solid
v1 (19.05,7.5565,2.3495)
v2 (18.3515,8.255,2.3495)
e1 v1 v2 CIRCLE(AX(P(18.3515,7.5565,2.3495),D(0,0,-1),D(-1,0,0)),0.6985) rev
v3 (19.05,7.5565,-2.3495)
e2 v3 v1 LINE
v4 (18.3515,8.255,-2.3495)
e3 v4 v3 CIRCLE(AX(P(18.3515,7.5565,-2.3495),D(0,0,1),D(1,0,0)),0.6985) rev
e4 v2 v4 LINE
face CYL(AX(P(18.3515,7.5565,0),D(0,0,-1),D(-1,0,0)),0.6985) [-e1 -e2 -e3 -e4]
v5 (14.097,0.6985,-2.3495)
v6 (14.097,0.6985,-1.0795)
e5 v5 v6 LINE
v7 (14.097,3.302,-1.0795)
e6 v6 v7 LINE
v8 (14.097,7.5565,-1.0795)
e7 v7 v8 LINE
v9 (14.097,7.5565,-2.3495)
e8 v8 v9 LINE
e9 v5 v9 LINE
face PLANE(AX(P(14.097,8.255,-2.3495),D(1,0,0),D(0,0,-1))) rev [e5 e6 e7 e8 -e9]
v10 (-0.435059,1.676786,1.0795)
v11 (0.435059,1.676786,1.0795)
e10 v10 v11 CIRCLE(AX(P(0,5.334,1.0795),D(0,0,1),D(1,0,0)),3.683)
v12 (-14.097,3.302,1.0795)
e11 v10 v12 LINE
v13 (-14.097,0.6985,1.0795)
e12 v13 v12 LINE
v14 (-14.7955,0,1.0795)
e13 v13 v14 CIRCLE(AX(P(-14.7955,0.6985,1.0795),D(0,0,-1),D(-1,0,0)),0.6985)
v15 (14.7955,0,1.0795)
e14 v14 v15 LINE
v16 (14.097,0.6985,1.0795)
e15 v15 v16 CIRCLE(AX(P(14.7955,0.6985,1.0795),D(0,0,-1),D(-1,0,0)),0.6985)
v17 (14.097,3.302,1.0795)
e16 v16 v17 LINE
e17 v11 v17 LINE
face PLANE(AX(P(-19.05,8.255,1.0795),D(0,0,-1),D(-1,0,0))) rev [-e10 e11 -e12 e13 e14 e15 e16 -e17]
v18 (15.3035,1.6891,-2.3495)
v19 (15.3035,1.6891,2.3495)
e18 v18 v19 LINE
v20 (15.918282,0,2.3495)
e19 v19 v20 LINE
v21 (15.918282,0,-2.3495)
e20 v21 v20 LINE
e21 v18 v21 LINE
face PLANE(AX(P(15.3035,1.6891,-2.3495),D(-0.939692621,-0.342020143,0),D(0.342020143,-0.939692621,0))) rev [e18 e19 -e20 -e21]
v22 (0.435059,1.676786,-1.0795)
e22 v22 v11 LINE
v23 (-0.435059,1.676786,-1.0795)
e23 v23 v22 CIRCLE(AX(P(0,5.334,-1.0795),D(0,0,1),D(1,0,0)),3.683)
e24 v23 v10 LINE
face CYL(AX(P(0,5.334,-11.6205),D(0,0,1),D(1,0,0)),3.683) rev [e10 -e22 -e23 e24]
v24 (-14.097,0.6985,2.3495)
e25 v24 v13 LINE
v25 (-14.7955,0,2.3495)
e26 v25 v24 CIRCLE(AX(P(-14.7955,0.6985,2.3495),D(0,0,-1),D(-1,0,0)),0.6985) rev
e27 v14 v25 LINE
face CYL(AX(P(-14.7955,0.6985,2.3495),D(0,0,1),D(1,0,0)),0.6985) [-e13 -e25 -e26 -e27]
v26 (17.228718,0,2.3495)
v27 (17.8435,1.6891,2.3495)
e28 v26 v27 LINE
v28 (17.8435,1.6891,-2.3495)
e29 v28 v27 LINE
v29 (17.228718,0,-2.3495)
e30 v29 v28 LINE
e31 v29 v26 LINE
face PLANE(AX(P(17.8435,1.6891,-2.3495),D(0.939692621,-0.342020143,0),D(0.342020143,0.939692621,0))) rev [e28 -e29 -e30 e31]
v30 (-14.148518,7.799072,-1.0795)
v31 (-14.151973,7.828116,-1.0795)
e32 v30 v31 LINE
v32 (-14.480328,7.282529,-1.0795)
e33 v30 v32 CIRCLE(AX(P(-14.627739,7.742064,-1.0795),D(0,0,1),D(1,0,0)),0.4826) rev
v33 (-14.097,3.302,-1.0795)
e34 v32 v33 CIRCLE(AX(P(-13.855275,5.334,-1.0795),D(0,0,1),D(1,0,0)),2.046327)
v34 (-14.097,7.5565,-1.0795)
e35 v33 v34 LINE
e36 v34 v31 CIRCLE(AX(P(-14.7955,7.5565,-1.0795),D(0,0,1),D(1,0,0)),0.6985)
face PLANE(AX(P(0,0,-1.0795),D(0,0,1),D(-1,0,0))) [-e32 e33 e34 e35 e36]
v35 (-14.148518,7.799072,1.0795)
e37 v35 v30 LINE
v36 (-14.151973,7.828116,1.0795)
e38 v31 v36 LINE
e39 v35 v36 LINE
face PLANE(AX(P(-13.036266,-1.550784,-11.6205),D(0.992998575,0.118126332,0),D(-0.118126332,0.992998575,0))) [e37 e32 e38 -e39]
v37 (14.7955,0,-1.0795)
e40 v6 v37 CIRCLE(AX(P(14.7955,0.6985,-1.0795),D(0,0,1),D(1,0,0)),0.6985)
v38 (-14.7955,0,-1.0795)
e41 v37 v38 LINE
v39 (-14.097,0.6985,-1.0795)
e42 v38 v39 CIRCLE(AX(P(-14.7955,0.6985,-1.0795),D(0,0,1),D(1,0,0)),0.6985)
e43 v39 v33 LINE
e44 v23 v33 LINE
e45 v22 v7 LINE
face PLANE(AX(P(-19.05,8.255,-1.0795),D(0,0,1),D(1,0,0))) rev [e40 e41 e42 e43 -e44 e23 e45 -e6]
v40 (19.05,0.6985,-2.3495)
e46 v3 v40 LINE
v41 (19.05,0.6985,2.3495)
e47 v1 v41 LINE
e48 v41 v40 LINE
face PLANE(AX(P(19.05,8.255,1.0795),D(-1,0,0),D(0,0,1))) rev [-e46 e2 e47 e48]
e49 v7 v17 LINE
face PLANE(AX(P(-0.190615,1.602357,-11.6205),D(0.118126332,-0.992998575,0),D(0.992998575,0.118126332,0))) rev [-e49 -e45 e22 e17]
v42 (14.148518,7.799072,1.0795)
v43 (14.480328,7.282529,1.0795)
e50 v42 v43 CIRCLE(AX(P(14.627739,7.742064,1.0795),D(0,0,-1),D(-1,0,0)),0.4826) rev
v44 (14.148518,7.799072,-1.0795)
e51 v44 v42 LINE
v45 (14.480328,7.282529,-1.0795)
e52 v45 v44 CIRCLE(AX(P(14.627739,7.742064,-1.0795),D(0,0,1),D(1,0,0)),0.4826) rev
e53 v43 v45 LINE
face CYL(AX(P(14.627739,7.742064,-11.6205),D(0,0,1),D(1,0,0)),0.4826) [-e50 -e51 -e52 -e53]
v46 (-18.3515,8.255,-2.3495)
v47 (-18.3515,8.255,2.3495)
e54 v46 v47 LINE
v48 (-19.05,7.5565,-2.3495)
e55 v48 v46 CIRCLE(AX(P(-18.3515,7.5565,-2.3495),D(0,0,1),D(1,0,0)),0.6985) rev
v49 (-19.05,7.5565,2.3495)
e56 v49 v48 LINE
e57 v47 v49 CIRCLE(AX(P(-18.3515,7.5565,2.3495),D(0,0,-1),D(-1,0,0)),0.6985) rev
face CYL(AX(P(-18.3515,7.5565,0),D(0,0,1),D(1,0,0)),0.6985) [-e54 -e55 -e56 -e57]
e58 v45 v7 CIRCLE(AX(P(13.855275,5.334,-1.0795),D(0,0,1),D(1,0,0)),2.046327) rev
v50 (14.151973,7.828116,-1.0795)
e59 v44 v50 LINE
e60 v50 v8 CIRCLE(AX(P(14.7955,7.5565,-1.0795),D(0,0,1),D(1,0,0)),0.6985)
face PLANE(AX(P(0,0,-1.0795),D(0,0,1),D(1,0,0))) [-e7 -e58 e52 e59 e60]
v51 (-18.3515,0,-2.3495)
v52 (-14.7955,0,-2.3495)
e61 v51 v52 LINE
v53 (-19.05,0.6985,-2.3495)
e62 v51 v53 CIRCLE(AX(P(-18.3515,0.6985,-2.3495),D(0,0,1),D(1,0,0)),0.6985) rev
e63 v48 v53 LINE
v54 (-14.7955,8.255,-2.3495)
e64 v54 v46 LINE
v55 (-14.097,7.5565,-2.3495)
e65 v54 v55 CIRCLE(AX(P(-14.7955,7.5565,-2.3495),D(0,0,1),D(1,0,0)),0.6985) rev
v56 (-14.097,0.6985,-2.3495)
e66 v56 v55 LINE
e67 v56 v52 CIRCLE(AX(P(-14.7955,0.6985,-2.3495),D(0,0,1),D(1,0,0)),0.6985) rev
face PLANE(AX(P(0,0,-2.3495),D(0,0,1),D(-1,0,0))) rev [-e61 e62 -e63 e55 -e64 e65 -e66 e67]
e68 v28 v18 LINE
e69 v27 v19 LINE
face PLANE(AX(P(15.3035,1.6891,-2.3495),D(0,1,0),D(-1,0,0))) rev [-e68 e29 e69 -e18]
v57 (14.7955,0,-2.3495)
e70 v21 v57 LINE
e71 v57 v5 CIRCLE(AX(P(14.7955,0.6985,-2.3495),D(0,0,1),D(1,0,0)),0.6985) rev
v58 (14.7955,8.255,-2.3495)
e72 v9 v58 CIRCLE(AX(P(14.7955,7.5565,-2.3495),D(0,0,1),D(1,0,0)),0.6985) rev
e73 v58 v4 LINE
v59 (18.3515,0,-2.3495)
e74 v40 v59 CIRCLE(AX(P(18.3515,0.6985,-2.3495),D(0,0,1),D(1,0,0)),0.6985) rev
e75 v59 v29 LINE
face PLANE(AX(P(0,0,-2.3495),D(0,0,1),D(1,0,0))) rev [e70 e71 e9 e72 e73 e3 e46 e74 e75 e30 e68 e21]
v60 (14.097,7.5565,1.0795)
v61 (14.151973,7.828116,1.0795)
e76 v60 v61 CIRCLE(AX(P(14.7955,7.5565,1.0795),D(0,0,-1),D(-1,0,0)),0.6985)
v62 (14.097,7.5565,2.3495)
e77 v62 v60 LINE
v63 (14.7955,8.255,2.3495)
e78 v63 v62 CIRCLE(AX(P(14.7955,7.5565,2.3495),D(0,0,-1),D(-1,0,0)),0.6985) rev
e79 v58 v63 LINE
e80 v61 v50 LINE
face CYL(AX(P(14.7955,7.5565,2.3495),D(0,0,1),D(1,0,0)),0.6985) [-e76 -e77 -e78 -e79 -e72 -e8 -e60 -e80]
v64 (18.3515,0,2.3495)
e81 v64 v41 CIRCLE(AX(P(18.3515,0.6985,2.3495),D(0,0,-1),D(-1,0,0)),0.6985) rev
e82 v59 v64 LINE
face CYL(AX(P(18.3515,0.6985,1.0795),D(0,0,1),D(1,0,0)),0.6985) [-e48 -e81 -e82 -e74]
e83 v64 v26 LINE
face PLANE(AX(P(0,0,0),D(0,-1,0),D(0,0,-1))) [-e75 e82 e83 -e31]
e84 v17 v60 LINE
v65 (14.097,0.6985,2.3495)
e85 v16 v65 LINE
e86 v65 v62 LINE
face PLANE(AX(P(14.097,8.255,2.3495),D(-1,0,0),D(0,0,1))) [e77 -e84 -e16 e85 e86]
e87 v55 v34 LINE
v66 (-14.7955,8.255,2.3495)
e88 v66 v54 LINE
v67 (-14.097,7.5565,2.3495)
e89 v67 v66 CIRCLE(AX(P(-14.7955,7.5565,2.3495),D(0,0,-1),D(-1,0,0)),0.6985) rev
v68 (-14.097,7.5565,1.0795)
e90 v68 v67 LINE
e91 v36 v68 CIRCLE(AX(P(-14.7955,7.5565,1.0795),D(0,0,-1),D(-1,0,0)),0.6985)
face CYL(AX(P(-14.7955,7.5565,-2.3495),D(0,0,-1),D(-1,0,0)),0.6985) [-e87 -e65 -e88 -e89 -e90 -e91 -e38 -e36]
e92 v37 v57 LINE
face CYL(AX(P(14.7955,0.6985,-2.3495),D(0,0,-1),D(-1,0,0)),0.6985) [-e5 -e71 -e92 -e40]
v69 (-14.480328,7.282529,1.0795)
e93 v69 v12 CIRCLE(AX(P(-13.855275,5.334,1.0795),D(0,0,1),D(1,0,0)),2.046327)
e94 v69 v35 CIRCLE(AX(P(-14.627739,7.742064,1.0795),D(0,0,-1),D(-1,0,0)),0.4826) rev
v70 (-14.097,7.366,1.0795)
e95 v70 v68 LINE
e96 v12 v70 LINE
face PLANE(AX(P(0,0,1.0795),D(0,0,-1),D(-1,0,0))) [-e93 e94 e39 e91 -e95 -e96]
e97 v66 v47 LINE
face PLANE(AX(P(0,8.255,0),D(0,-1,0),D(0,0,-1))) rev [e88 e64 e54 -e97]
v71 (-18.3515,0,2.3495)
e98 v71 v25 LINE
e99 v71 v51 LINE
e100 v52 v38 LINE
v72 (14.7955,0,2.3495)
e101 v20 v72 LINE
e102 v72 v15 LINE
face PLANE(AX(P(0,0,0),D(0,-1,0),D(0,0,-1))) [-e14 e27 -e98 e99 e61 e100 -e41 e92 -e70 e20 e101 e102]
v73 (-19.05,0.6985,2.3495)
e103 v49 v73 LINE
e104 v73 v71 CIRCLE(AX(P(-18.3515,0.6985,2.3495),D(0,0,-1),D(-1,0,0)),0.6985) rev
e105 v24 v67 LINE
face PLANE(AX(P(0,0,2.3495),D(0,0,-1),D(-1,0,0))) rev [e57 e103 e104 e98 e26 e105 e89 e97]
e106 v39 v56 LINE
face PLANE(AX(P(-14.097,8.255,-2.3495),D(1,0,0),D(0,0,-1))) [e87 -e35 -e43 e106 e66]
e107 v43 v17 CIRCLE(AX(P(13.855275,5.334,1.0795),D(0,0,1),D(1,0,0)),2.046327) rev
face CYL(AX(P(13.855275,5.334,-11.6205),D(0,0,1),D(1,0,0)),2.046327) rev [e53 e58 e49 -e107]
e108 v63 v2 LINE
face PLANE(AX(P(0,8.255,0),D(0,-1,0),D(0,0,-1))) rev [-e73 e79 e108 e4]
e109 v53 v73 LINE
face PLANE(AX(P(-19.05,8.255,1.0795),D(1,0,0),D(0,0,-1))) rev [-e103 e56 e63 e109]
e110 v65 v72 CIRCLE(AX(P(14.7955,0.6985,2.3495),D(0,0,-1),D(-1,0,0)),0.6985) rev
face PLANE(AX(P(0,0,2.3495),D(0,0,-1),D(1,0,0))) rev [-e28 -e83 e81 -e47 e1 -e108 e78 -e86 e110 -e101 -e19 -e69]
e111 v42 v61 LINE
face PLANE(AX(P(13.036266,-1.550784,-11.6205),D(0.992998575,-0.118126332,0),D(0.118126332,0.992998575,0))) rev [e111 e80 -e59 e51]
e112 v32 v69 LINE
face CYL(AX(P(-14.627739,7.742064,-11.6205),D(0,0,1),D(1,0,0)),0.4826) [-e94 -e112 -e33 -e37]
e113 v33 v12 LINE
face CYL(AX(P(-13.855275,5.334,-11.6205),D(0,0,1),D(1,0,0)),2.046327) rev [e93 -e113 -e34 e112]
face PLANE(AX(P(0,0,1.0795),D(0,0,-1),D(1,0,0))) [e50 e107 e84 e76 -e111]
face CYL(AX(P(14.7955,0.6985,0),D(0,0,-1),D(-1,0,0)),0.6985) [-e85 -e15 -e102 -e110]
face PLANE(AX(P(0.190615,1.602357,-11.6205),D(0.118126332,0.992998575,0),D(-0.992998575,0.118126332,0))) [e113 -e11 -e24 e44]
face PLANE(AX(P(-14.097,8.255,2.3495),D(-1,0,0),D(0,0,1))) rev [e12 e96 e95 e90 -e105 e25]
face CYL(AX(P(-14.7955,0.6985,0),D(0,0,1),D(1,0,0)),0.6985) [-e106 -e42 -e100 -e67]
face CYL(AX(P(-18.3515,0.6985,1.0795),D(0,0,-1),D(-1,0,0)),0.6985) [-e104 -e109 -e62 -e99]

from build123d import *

# Parameters (mm, degrees)
SKETCH1_W               = 38.1
SKETCH1_H               = 2.159
BOSS_EXTRUDE1_DEPTH     = 8.255
CUT_EXTRUDE1_DEPTH      = 12.7
SKETCH3_W               = 4.953
SKETCH3_H               = 8.255
BOSS_EXTRUDE2_DEPTH     = 1.27
FILLET5_R               = 0.4826
MIRROR2_COPY_1_SKETCH_W = 4.953
MIRROR2_COPY_1_SKETCH_H = 8.255
MIRROR2_COPY_1_DEPTH    = 1.27
CUT_EXTRUDE2_DEPTH      = 22.286806422
FILLET6_R               = 0.6985


with BuildPart() as part:
    # Sketch1 → Boss-Extrude1 (new body)
    with BuildSketch(Plane(origin=(0, 0, 0), x_dir=(1, 0, 0), z_dir=(0, 1, 0))):
        Rectangle(SKETCH1_W, SKETCH1_H)
    extrude(amount=BOSS_EXTRUDE1_DEPTH)

    # Sketch2 → Cut-Extrude1 (cut)
    with BuildSketch(Plane.XY.offset(1.0795)):
        with BuildLine():
            ThreePointArc((-0.435059279, 1.676786249), (0, 1.651), (0.435059279, 1.676786249))
            Line((0.435059279, 1.676786249), (14.097, 3.302))
            ThreePointArc((14.097, 3.302), (15.901602081, 5.334), (14.097, 7.366))
            Line((14.097, 7.366), (14.202754743, 8.255))
            Line((14.202754743, 8.255), (-14.202754743, 8.255))
            Line((-14.202754743, 8.255), (-14.097, 7.366))
            ThreePointArc((-14.097, 7.366), (-15.901602081, 5.334), (-14.097, 3.302))
            Line((-14.097, 3.302), (-0.435059279, 1.676786249))
        make_face()
    extrude(amount=-CUT_EXTRUDE1_DEPTH, mode=Mode.SUBTRACT)

    # Sketch3 → Boss-Extrude2 (add)
    with BuildSketch(Plane.XY.offset(1.0795)):
        with Locations((-16.5735, 4.1275)):
            Rectangle(SKETCH3_W, SKETCH3_H)
    boss_extrude2 = extrude(amount=BOSS_EXTRUDE2_DEPTH)

    # Fillet5
    fillet5_edges = [part.edges().sort_by_distance(p)[0] for p in [
        (14.202754743, 8.255, 0),
        (-14.202754743, 8.255, 0),
        (14.097, 7.366, 0),
        (-14.097, 7.366, 0),
    ]]
    fillet(fillet5_edges, radius=FILLET5_R)

    # Mirror1: Boss-Extrude2 across plane
    add(boss_extrude2.mirror(Plane(origin=(0, 0, 0), x_dir=(0, 0, 1), z_dir=(1, 0, 0))))

    # Mirror2: Boss-Extrude2 across plane
    add(boss_extrude2.mirror(Plane.XY))

    # Mirror2 copy 1 sketch → Mirror2 copy 1 (add)
    with BuildSketch(Plane(origin=(0, 0, -1.0795), x_dir=(-1, 0, 0), z_dir=(0, 0, -1))):
        with Locations((-16.5735, 4.1275)):
            Rectangle(MIRROR2_COPY_1_SKETCH_W, MIRROR2_COPY_1_SKETCH_H)
    extrude(amount=MIRROR2_COPY_1_DEPTH)

    # Sketch4 → Cut-Extrude2 (cut, through all)
    with BuildSketch(Plane.XY.offset(2.3495)):
        Polygon((15.3035, 1.6891), (17.8435, 1.6891), (17.228717877, 0), (15.918282123, 0), align=None)
    extrude(amount=-CUT_EXTRUDE2_DEPTH, mode=Mode.SUBTRACT)

    # Fillet6
    # the kernel refuses this fillet: 0.6985 mm, written as the material it takes off along each edge
    with BuildSketch(Plane(origin=(-19.05, 8.255, -4.09575), x_dir=(1, 0, 0), z_dir=(0, 0, 1)), Plane(origin=(19.05, 8.255, 4.09575), x_dir=(-1, 0, 0), z_dir=(0, 0, -1)), Plane(origin=(-19.05, 0, 4.09575), x_dir=(1, 0, 0), z_dir=(0, 0, -1))) as fillet6_piece_1:
        with BuildLine():
            CenterArc((FILLET6_R, -FILLET6_R), FILLET6_R, 90, 90)
            Line((0, -FILLET6_R), (0, 0))
            Line((0, 0), (FILLET6_R, 0))
        make_face()
    extrude(amount=8.1915, mode=Mode.SUBTRACT)
    with BuildSketch(Plane(origin=(-14.097, 8.255, 0.66675), x_dir=(-1, 0, 0), z_dir=(0, 0, -1)), Plane(origin=(-14.097, 8.255, -0.66675), x_dir=(0, -1, 0), z_dir=(0, 0, 1))) as fillet6_piece_2:
        with BuildLine():
            CenterArc((FILLET6_R, -FILLET6_R), FILLET6_R, 90, 90)
            Line((0, -FILLET6_R), (0, 0))
            Line((0, 0), (FILLET6_R, 0))
        make_face()
    extrude(amount=4.7625, mode=Mode.SUBTRACT)
    with BuildSketch(Plane(origin=(-14.097, 0, -1.0795), x_dir=(-1, 0, 0), z_dir=(0, 0, -1)), Plane(origin=(-14.097, 0, 1.0795), x_dir=(0, 1, 0), z_dir=(0, 0, 1))) as fillet6_piece_3:
        with BuildLine():
            CenterArc((FILLET6_R, FILLET6_R), FILLET6_R, 180, 90)
            Line((0, FILLET6_R), (0, 0))
            Line((0, 0), (FILLET6_R, 0))
        make_face()
    extrude(amount=3.01625, mode=Mode.SUBTRACT)
    with BuildSketch(Plane(origin=(14.097, 0, -1.0795), x_dir=(1, 0, 0), z_dir=(0, 0, -1)), Plane(origin=(14.097, 0, 1.0795), x_dir=(0, 1, 0), z_dir=(0, 0, 1))) as fillet6_piece_4:
        with BuildLine():
            CenterArc((FILLET6_R, -FILLET6_R), FILLET6_R, 90, 90)
            Line((0, -FILLET6_R), (0, 0))
            Line((0, 0), (FILLET6_R, 0))
        make_face()
    extrude(amount=3.01625, mode=Mode.SUBTRACT)
    with BuildSketch(Plane(origin=(14.097, 8.255, 0.66675), x_dir=(1, 0, 0), z_dir=(0, 0, -1)), Plane(origin=(14.097, 8.255, -0.66675), x_dir=(0, -1, 0), z_dir=(0, 0, 1))) as fillet6_piece_5:
        with BuildLine():
            CenterArc((FILLET6_R, FILLET6_R), FILLET6_R, 180, 90)
            Line((0, FILLET6_R), (0, 0))
            Line((0, 0), (FILLET6_R, 0))
        make_face()
    extrude(amount=4.7625, mode=Mode.SUBTRACT)
    with BuildSketch(Plane(origin=(19.05, 0, -4.09575), x_dir=(0, 1, 0), z_dir=(0, 0, 1))) as fillet6_piece_6:
        with BuildLine():
            CenterArc((FILLET6_R, FILLET6_R), FILLET6_R, 180, 90)
            Line((0, FILLET6_R), (0, 0))
            Line((0, 0), (FILLET6_R, 0))
        make_face()
    extrude(amount=8.1915, mode=Mode.SUBTRACT)


solid = part.part
